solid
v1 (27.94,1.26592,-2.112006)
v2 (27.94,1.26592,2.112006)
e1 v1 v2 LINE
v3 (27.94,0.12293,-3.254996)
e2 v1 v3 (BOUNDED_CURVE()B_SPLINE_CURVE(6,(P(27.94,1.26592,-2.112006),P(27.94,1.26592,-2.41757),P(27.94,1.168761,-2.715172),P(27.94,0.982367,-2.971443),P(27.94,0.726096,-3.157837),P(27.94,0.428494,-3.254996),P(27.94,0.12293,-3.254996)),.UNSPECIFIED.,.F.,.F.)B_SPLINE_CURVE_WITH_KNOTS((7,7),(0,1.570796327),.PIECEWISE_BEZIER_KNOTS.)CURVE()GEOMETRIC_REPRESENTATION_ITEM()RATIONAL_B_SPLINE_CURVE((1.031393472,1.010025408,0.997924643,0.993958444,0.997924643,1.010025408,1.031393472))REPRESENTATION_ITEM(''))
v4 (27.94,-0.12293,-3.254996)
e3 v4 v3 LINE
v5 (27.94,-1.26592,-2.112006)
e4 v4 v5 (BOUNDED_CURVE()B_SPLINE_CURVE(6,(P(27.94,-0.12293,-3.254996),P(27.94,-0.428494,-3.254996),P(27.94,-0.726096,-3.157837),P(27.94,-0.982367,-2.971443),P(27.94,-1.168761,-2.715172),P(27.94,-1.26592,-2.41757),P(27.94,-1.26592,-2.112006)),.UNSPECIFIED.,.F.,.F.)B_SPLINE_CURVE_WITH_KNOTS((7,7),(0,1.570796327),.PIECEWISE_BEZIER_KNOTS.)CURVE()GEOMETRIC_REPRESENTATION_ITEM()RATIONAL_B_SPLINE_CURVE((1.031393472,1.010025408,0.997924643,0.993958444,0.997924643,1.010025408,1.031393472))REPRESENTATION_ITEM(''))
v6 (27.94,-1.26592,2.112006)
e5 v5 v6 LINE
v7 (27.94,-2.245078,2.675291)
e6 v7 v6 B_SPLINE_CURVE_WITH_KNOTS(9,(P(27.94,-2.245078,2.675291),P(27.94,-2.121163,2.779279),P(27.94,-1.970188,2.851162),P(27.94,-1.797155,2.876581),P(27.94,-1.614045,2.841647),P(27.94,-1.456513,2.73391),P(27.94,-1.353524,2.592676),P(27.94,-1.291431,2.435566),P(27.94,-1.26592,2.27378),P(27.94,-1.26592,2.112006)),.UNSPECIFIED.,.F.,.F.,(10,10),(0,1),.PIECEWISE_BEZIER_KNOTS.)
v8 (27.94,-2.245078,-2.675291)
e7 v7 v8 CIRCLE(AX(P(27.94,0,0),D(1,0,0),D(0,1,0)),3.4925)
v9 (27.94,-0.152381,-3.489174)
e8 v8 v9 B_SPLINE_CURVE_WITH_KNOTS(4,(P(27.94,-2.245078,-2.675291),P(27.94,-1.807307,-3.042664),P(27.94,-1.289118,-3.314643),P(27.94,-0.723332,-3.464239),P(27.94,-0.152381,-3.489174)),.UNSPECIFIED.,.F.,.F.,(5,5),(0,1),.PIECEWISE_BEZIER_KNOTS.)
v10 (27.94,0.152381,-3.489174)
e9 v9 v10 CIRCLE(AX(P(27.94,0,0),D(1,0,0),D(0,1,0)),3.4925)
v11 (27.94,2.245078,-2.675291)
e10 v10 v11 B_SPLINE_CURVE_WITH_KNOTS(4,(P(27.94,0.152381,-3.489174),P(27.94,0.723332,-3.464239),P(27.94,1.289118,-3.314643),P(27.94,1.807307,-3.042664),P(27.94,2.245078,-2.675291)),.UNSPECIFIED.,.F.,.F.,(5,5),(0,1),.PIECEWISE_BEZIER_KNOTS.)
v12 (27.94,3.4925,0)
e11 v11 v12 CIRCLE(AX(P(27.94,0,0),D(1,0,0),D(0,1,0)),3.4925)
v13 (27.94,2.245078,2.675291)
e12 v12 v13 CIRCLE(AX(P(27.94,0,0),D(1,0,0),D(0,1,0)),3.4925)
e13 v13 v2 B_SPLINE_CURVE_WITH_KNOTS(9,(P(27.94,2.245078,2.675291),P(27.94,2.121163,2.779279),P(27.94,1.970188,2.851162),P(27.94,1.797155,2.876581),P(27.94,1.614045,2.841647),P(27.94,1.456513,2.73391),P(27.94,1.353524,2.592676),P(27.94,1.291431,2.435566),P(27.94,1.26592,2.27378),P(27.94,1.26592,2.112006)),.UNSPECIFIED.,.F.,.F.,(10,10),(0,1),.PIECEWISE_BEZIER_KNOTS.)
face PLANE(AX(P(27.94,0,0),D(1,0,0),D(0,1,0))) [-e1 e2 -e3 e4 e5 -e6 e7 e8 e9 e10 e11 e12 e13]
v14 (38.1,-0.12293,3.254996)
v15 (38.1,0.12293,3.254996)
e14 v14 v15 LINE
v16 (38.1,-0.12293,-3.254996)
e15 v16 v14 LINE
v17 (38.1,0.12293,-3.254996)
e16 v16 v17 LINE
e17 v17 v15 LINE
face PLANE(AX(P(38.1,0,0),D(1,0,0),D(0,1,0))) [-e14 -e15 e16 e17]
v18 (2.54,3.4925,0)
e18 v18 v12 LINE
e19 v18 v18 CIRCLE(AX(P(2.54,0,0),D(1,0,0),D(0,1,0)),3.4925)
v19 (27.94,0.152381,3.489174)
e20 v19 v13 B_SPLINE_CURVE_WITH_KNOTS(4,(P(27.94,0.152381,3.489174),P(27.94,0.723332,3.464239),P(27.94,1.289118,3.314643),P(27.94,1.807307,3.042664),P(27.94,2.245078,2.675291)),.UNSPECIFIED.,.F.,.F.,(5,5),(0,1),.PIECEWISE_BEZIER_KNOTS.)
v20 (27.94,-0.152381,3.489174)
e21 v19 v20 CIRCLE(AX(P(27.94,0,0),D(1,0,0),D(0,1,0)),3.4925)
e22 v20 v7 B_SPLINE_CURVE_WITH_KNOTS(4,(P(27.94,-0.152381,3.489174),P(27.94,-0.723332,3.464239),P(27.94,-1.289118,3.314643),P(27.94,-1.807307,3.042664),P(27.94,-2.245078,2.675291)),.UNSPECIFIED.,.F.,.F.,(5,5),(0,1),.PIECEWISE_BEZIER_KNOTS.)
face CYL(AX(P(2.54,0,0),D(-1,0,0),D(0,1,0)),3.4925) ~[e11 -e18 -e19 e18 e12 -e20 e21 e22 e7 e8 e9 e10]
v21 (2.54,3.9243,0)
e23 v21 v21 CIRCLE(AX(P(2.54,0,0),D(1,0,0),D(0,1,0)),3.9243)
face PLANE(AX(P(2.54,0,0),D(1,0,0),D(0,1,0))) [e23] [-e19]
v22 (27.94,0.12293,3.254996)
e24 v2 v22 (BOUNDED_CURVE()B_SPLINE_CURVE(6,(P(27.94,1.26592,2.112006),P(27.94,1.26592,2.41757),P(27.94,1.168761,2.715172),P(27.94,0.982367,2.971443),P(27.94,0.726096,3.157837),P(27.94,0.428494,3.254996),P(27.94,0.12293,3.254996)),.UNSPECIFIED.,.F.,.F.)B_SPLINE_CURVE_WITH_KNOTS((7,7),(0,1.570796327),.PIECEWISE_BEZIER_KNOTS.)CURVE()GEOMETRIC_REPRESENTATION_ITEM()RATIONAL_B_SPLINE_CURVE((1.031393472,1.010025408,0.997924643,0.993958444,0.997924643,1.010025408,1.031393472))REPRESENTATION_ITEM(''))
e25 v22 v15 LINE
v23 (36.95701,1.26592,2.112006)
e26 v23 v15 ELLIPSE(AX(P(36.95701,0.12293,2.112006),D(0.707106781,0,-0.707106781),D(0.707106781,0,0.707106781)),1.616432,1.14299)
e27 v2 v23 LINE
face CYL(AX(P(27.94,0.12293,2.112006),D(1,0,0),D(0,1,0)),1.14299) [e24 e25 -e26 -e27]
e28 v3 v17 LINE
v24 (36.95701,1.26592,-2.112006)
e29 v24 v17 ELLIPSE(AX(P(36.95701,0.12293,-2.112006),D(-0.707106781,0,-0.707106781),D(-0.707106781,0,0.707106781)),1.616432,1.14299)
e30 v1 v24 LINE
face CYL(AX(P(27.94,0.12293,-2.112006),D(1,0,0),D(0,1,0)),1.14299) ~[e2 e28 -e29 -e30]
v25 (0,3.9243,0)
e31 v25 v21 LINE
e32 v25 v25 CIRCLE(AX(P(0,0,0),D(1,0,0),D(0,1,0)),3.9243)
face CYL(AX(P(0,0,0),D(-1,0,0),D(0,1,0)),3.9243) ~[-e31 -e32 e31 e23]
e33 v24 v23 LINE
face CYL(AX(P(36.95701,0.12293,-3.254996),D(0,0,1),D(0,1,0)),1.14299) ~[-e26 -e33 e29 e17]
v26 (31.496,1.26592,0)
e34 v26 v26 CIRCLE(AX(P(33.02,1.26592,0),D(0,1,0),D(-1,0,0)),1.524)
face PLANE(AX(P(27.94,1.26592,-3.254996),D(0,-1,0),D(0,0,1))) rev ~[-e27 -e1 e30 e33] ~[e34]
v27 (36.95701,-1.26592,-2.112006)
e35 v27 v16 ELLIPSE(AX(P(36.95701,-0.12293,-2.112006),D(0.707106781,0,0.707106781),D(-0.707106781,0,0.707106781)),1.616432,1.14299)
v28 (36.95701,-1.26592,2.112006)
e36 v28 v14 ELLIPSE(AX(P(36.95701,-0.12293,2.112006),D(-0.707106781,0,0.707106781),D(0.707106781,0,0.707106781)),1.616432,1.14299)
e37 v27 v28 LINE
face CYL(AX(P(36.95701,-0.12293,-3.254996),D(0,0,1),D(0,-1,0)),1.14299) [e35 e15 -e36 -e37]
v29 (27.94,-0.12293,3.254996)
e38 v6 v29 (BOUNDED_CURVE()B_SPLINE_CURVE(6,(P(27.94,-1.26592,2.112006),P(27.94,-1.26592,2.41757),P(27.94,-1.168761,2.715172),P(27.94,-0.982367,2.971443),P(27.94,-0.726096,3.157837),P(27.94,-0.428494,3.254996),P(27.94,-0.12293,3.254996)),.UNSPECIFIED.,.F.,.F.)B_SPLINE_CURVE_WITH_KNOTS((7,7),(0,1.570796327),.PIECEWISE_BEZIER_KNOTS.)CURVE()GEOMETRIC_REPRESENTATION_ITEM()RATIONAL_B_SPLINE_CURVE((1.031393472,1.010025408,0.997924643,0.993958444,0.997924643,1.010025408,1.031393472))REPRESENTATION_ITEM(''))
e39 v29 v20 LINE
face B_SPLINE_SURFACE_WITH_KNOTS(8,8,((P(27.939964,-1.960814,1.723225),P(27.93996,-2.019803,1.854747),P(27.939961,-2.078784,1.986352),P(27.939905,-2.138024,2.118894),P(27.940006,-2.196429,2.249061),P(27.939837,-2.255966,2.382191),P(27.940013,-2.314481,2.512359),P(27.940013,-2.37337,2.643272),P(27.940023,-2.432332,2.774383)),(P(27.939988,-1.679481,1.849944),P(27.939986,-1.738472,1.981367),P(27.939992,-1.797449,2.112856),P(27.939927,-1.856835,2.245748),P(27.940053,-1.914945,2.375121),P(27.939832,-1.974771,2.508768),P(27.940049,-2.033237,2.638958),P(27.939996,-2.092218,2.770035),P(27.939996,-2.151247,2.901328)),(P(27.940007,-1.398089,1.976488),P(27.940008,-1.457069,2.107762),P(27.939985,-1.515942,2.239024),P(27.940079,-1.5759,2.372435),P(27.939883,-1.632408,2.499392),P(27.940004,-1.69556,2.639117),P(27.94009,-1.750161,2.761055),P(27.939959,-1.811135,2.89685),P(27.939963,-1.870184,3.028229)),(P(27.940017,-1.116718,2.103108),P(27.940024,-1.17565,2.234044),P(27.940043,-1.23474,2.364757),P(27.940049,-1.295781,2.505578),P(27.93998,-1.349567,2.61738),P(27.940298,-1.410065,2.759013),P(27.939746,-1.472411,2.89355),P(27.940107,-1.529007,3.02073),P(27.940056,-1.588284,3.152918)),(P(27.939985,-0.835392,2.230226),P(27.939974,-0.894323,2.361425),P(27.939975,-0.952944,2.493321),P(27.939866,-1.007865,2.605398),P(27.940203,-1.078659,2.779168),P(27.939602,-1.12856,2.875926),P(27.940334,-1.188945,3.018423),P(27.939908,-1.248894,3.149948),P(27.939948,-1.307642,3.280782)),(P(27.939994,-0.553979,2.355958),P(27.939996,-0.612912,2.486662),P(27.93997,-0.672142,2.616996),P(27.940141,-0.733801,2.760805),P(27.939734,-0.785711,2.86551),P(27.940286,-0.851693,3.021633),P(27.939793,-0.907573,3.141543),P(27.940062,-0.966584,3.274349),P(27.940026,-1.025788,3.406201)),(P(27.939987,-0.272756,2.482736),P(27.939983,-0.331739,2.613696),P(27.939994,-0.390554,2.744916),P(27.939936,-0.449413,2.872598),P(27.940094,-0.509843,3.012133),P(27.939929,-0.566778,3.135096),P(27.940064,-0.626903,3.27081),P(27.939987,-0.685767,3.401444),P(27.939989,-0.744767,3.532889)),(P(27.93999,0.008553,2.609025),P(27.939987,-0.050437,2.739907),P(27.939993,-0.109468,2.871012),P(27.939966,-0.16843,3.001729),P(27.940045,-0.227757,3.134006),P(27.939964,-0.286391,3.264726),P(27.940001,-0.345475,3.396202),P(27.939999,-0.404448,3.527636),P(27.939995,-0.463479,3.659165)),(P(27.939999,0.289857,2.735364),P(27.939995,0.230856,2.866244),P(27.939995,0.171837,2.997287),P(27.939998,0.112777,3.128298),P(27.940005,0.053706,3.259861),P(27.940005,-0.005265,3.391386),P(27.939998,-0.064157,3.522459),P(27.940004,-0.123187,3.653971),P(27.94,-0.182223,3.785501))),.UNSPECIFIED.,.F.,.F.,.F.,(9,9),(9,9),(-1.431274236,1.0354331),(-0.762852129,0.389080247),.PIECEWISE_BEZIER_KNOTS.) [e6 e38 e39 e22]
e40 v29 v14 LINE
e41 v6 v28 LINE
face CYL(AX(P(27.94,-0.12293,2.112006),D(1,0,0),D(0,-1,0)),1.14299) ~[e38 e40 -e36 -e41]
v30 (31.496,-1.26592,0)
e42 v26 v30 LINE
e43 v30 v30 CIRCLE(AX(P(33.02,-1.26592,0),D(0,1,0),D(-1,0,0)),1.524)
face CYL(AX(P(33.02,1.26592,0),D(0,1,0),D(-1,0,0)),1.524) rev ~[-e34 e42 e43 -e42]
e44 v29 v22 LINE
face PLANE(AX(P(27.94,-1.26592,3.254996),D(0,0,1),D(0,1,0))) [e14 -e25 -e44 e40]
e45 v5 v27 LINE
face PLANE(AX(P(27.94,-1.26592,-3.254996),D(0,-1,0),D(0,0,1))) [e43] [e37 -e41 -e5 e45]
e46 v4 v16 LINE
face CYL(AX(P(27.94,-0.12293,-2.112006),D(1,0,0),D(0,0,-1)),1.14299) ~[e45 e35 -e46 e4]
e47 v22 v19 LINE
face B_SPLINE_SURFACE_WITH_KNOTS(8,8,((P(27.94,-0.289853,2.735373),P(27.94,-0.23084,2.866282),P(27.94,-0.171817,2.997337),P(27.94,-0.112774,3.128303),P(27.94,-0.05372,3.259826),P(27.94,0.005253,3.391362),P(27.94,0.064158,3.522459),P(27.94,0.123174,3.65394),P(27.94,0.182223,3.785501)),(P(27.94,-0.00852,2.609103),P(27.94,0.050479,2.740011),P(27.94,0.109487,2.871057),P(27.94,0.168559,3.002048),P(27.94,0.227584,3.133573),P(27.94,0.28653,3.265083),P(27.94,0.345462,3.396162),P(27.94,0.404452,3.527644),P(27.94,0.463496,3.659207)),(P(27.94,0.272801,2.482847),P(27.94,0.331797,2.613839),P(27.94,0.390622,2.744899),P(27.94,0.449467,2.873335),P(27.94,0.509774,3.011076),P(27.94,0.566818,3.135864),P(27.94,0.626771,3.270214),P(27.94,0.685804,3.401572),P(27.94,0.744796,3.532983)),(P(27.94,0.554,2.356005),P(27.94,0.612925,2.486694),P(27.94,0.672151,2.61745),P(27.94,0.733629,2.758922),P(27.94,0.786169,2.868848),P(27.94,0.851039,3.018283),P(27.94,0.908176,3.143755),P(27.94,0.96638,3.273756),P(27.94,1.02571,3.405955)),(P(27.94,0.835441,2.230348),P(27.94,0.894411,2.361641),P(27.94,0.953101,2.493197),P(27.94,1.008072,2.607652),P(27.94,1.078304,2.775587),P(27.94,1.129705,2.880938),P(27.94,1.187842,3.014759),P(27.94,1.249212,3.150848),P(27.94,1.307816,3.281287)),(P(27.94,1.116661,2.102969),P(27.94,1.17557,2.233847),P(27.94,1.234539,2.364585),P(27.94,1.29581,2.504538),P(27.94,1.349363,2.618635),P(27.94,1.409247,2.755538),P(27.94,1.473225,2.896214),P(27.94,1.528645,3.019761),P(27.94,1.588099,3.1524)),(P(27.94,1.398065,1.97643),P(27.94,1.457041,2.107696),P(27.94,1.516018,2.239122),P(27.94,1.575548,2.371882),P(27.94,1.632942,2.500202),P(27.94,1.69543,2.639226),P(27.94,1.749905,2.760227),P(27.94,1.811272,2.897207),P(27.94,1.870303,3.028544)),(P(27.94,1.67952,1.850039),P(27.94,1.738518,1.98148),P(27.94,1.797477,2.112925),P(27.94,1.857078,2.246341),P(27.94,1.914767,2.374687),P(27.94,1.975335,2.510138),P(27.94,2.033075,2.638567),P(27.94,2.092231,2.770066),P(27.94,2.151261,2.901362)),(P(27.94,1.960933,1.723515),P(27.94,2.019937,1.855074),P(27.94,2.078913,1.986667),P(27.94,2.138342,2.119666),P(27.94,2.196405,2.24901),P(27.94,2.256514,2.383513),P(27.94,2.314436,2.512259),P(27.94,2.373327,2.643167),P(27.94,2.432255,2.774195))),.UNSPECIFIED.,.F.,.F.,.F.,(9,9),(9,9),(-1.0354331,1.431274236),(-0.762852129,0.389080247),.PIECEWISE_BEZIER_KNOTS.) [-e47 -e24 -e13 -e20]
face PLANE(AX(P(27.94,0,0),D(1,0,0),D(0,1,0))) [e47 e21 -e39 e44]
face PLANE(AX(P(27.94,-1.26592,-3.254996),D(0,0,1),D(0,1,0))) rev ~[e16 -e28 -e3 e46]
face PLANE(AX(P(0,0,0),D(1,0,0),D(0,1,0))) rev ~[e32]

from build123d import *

# Parameters (mm, degrees)
F0_R     = 3.9243
F1_DEPTH = 2.54
F2_R     = 3.4925
F3_DEPTH = 25.4
F4_W     = 2.531840682
F4_H     = 6.5099929156
F5_DEPTH = 10.16
F6_R     = 1.524
F7_DEPTH = 25.4
F8_R     = 1.14299


# Not quite as in the source:
# - a fillet or chamfer is up to 0.001 mm smaller than in the source, because OpenCascade refuses the exact size


with BuildPart() as f1:
    # F0 (on Right) → F1 (new body)
    with BuildSketch(Plane.YZ):
        Circle(F0_R)
    extrude(amount=F1_DEPTH)

    # F2 (on face) → F3 (join)
    with BuildSketch(Plane.YZ.offset(2.54)):
        Circle(F2_R)
    extrude(amount=F3_DEPTH)

    # F4 (on face) → F5 (join)
    with BuildSketch(Plane.YZ.offset(27.94)):
        Rectangle(F4_W, F4_H)
    extrude(amount=F5_DEPTH)

    # F6 (on face) → F7 (cut)
    with BuildSketch(Plane(origin=(0, 1.265920341, 0), x_dir=(-1, 0, 0), z_dir=(0, 1, 0))):
        with Locations((-33.02, 0)):
            Circle(F6_R)
    extrude(amount=-F7_DEPTH, mode=Mode.SUBTRACT)

    # F8 (radius 1.143 in the source; OpenCascade refuses exactly that, so slightly less here)
    f8_edges = [f1.edges().sort_by_distance(p)[0] for p in [
        (38.1, 1.26592, 0),
        (38.1, -1.26592, 0),
        (33.02, 1.26592, 3.254996),
        (33.02, -1.26592, 3.254996),
        (33.02, 1.26592, -3.254996),
        (33.02, -1.26592, -3.254996),
    ]]
    fillet(f8_edges, radius=F8_R)


solid = f1.part
